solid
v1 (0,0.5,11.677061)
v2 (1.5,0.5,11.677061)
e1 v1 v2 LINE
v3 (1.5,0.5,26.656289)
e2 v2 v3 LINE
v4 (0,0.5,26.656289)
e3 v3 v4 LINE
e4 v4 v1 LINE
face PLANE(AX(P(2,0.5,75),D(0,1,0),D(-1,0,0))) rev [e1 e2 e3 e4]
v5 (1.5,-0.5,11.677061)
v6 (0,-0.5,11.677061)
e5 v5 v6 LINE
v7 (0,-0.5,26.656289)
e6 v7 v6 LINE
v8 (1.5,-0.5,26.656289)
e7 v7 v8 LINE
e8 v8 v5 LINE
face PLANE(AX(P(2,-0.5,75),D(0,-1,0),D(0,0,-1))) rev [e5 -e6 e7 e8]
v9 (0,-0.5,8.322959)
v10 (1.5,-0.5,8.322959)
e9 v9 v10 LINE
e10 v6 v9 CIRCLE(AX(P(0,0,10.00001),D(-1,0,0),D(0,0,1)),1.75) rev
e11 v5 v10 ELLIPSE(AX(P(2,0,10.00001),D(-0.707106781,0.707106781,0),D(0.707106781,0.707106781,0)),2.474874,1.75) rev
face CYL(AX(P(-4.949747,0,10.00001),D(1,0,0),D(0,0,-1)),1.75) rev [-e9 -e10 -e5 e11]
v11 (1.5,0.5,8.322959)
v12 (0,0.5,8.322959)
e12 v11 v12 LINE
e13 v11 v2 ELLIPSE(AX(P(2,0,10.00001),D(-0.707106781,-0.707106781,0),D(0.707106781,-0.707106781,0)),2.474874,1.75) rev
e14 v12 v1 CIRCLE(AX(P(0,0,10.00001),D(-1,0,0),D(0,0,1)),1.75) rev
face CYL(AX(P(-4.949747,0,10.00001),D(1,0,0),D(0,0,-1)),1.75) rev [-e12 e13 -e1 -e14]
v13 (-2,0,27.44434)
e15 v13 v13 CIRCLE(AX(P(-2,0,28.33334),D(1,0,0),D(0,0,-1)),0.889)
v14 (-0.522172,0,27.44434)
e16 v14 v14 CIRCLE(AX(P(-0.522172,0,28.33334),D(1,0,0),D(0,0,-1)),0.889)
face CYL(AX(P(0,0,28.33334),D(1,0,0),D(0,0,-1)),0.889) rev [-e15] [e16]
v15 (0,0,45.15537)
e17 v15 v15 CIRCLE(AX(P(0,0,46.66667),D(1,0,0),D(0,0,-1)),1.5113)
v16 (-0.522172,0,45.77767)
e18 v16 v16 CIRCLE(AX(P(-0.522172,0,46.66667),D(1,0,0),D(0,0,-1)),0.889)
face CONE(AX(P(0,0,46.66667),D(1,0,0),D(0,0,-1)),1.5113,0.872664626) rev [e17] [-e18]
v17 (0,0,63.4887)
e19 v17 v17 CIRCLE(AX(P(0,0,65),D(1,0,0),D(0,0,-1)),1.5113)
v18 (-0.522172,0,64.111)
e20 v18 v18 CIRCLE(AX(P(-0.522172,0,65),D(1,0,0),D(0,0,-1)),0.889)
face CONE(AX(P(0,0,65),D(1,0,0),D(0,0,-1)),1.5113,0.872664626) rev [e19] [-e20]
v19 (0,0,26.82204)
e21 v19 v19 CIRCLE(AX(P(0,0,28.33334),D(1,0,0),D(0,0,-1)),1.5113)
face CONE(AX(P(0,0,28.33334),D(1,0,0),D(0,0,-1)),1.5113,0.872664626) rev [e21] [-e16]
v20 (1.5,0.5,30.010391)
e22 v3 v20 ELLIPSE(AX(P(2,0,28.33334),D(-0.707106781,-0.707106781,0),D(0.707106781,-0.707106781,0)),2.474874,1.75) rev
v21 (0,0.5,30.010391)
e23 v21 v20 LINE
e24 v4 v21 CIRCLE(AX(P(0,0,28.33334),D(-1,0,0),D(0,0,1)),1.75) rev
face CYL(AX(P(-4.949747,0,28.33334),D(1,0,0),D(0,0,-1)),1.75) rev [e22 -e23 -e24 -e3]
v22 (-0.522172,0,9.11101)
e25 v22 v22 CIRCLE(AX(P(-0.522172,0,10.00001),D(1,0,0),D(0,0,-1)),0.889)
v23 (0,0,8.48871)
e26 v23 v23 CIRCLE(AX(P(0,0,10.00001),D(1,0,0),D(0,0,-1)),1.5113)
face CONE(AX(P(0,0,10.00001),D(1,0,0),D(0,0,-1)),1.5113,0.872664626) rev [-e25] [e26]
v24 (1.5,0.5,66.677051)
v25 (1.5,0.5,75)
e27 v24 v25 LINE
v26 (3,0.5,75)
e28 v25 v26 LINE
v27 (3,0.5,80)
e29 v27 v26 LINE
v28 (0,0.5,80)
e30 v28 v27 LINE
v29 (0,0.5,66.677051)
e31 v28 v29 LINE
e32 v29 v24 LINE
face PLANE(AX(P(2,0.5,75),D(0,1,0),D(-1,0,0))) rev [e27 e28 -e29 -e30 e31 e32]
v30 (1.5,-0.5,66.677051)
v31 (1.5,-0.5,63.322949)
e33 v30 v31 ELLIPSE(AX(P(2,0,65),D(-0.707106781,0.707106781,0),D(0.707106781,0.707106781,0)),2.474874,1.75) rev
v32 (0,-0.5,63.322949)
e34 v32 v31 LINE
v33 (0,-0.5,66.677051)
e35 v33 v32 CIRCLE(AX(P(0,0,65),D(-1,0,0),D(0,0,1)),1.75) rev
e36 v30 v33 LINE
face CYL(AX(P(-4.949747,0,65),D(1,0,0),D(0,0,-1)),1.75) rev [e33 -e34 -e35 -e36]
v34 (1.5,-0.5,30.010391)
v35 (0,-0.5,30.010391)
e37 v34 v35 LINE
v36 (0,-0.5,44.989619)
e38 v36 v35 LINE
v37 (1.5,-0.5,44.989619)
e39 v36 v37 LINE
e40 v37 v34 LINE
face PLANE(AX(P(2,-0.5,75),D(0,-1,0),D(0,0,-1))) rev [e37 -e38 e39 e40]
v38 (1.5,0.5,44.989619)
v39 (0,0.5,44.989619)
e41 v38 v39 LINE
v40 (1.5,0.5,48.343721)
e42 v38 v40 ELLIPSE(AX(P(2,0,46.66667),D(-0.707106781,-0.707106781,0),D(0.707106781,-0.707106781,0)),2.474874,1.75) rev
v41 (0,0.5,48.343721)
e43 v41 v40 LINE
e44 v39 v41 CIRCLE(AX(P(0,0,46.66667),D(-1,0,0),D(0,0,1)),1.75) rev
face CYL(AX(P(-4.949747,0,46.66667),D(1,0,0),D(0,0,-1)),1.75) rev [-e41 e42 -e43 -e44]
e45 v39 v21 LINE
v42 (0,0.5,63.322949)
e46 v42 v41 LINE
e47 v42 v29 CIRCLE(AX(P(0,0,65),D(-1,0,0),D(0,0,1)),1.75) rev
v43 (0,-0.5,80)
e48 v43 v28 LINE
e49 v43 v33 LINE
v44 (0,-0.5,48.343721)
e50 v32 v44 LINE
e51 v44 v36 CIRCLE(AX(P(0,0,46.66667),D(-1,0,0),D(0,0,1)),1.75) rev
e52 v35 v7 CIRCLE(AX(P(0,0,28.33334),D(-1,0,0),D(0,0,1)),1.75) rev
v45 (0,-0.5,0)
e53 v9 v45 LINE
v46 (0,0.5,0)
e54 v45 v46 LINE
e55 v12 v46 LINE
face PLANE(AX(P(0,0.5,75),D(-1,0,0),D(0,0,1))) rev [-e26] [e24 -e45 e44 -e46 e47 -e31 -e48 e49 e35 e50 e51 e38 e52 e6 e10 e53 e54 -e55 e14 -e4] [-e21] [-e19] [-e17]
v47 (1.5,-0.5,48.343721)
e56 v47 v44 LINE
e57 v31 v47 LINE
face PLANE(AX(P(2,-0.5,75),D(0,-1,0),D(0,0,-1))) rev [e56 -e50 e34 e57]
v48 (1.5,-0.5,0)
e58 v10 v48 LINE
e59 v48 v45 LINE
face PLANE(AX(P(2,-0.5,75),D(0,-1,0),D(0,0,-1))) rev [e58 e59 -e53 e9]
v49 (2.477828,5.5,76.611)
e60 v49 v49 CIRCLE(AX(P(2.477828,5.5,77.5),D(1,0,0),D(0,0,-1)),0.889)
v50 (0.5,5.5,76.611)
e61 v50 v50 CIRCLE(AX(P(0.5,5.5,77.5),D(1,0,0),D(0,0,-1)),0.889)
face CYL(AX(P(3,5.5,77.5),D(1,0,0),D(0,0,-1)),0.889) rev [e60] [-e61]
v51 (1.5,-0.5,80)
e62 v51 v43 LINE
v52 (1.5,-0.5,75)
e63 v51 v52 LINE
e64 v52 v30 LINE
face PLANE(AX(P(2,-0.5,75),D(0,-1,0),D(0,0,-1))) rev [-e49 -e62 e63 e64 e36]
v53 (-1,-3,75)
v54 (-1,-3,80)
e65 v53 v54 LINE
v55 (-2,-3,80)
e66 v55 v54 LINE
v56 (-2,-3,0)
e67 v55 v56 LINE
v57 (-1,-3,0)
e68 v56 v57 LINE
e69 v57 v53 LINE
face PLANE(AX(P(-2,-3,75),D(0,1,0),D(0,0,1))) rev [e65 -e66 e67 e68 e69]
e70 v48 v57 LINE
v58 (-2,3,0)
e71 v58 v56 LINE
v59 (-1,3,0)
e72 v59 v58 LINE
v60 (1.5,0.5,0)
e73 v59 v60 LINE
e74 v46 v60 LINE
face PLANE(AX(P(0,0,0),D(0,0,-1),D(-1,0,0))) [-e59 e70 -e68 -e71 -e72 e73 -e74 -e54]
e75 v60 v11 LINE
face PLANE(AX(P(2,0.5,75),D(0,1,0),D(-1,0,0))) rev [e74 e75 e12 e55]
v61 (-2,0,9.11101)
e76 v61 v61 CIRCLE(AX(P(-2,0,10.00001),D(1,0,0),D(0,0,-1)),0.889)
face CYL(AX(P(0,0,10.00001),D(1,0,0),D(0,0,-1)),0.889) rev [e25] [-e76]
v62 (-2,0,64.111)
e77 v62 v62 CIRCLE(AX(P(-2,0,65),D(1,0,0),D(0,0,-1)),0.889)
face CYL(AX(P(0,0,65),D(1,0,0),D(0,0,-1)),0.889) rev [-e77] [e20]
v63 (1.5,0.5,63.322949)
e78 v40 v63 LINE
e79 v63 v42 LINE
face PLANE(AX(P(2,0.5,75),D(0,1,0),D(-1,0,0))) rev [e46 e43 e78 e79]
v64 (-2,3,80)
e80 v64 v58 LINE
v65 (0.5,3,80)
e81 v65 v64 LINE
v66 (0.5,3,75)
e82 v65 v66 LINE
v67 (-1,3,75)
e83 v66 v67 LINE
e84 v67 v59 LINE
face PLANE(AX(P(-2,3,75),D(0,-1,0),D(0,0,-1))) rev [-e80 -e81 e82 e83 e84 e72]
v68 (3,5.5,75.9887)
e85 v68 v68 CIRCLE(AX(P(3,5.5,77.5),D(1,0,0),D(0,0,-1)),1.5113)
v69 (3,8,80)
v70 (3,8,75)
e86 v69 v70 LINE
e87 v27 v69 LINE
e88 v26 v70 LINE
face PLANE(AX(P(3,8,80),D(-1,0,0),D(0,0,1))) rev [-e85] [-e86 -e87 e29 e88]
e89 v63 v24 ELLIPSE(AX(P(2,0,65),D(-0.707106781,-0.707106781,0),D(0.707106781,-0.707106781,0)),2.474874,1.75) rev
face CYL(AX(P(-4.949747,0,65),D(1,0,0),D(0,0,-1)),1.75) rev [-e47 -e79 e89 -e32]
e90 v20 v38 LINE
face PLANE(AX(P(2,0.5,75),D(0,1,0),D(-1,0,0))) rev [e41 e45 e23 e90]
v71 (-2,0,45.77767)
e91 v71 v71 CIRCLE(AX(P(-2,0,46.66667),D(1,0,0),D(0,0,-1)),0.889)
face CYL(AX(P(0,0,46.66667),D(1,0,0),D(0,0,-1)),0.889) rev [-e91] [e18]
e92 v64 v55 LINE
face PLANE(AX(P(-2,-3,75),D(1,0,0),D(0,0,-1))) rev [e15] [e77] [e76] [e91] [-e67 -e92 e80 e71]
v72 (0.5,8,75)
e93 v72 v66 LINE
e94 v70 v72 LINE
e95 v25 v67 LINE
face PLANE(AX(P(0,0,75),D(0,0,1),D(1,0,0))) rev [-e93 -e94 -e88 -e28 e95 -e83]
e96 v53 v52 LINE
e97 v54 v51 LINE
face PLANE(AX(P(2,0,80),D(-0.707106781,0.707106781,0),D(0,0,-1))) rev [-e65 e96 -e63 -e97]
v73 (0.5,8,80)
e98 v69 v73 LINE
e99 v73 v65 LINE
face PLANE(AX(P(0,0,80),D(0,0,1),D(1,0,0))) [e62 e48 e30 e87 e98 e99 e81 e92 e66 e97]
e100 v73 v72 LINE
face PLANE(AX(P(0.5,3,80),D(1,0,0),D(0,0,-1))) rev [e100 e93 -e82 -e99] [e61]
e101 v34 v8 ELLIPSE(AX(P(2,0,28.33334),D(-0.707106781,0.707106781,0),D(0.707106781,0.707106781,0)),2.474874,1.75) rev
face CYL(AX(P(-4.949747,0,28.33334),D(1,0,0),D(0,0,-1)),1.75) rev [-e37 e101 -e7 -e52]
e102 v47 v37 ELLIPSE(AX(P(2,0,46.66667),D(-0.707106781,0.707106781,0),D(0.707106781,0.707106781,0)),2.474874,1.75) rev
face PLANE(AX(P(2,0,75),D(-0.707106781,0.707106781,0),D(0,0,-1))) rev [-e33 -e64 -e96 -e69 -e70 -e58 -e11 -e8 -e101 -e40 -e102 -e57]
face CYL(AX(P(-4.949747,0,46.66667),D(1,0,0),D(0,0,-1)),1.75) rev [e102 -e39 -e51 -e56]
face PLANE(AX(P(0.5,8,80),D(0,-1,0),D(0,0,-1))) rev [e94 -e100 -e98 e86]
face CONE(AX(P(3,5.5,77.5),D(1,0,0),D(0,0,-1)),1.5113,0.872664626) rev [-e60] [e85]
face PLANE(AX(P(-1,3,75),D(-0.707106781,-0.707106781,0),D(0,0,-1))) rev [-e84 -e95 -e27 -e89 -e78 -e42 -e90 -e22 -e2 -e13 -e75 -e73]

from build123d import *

# Parameters (mm, degrees)
BOSS_EXTRUDE1_DEPTH                               = 75
SKETCH5_R                                         = 1.75
CUT_EXTRUDE1_DEPTH                                = 2
CSK_FOR_0_FLAT_HEAD_MACHINE_SCREW_100_D           = 1.778
CSK_FOR_0_FLAT_HEAD_MACHINE_SCREW_100_DEPTH       = 3.302
CSK_FOR_0_FLAT_HEAD_MACHINE_SCREW_100_CSINK_D     = 3.0226
CSK_FOR_0_FLAT_HEAD_MACHINE_SCREW_100_CSINK_ANGLE = 100
CSK_FOR_0_FLAT_HEAD_MACHINE_SCREW_100_TIP         = 0.53416509
CHAMFER1_SIZE                                     = 3
BOSS_EXTRUDE2_DEPTH                               = 5
CHAMFER2_SIZE                                     = 3
CSK_FOR_0_FLAT_HEAD_MACHINE_SCREW_2_D             = 1.778
CSK_FOR_0_FLAT_HEAD_MACHINE_SCREW_2_DEPTH         = 3.302
CSK_FOR_0_FLAT_HEAD_MACHINE_SCREW_2_CSINK_D       = 3.0226
CSK_FOR_0_FLAT_HEAD_MACHINE_SCREW_2_CSINK_ANGLE   = 100
CSK_FOR_0_FLAT_HEAD_MACHINE_SCREW_2_TIP           = 0.53416509


with BuildPart() as part:
    # Sketch1 → Boss-Extrude1 (new body)
    with BuildSketch(Plane.XY):
        Polygon((-2, -3), (2, -3), (2, -0.5), (0, -0.5), (0, 0.5), (2, 0.5), (2, 3), (-2, 3), align=None)
    extrude(amount=BOSS_EXTRUDE1_DEPTH)

    # Sketch5 → Cut-Extrude1 (cut)
    with BuildSketch(Plane(origin=(2, 0, 0), x_dir=(0, 0, -1), z_dir=(1, 0, 0))):
        with Locations((-65, 0)):
            Circle(SKETCH5_R)
        with Locations((-46.66667, 0)):
            Circle(SKETCH5_R)
        with Locations((-28.33334, 0)):
            Circle(SKETCH5_R)
        with Locations((-10.00001, 0)):
            Circle(SKETCH5_R)
    extrude(amount=-CUT_EXTRUDE1_DEPTH, mode=Mode.SUBTRACT)

    # CSK for _0 Flat Head Machine Screw _100
    with Locations(Plane(origin=(0, 0, 0), x_dir=(0, 0, -1), z_dir=(1, 0, 0))):
        with Locations((-65, 0), (-10.00001, 0), (-46.66667, 0), (-28.33334, 0)):
            CounterSinkHole(CSK_FOR_0_FLAT_HEAD_MACHINE_SCREW_100_D / 2, CSK_FOR_0_FLAT_HEAD_MACHINE_SCREW_100_CSINK_D / 2, depth=CSK_FOR_0_FLAT_HEAD_MACHINE_SCREW_100_DEPTH, counter_sink_angle=CSK_FOR_0_FLAT_HEAD_MACHINE_SCREW_100_CSINK_ANGLE)
            with Locations((0, 0, -(CSK_FOR_0_FLAT_HEAD_MACHINE_SCREW_100_DEPTH + CSK_FOR_0_FLAT_HEAD_MACHINE_SCREW_100_TIP / 2))):  # 118° drill point
                Cone(0, CSK_FOR_0_FLAT_HEAD_MACHINE_SCREW_100_D / 2, CSK_FOR_0_FLAT_HEAD_MACHINE_SCREW_100_TIP, mode=Mode.SUBTRACT)

    # Chamfer1
    # the kernel refuses this chamfer: 3 mm, written as the material it takes off along each edge
    with BuildSketch(Plane(origin=(2, -3, -7.715048964), x_dir=(-0.9996219169112968, -0.027495876610586348, 0), z_dir=(0, 0, 1))) as chamfer1_piece_1:
        Polygon((CHAMFER1_SIZE * 0.999621916911, -CHAMFER1_SIZE * 0.0274958766106), (-CHAMFER1_SIZE * 0.0274958766106, -CHAMFER1_SIZE * 0.999621916911), (0, 0), align=None)
    extrude(amount=90.430097928, mode=Mode.SUBTRACT)
    with BuildSketch(Plane(origin=(2, 3, -7.715048964), x_dir=(-0.9996219169112968, 0.027495876610586348, 0), z_dir=(0, 0, 1))) as chamfer1_piece_2:
        Polygon((CHAMFER1_SIZE * 0.999621916911, CHAMFER1_SIZE * 0.0274958766106), (-CHAMFER1_SIZE * 0.0274958766106, CHAMFER1_SIZE * 0.999621916911), (0, 0), align=None)
    extrude(amount=90.430097928, mode=Mode.SUBTRACT)

    # Sketch6 → Boss-Extrude2 (add)
    with BuildSketch(Plane.XY.offset(75)):
        Polygon((0.5, 8), (3, 8), (3, 0.5), (0, 0.5), (0, -0.5), (2, -0.5), (2, -3), (-2, -3), (-2, 3), (0.5, 3), align=None)
    extrude(amount=BOSS_EXTRUDE2_DEPTH)

    # Chamfer2
    # the kernel refuses this chamfer: 3 mm, written as the material it takes off along each edge
    with BuildSketch(Plane(origin=(2, -3, 67.284951036), x_dir=(-0.9996219169112968, -0.027495876610586348, 0), z_dir=(0, 0, 1))) as chamfer2_piece_1:
        Polygon((CHAMFER2_SIZE * 0.999621916911, -CHAMFER2_SIZE * 0.0274958766106), (-CHAMFER2_SIZE * 0.0274958766106, -CHAMFER2_SIZE * 0.999621916911), (0, 0), align=None)
    extrude(amount=20.430097928, mode=Mode.SUBTRACT)

    # CSK for _0 Flat Head Machine Screw _ 2
    with Locations(Plane(origin=(3, 0, 0), x_dir=(0, 0, -1), z_dir=(1, 0, 0))):
        with Locations((-77.5, 5.5)):
            CounterSinkHole(CSK_FOR_0_FLAT_HEAD_MACHINE_SCREW_2_D / 2, CSK_FOR_0_FLAT_HEAD_MACHINE_SCREW_2_CSINK_D / 2, depth=CSK_FOR_0_FLAT_HEAD_MACHINE_SCREW_2_DEPTH, counter_sink_angle=CSK_FOR_0_FLAT_HEAD_MACHINE_SCREW_2_CSINK_ANGLE)
            with Locations((0, 0, -(CSK_FOR_0_FLAT_HEAD_MACHINE_SCREW_2_DEPTH + CSK_FOR_0_FLAT_HEAD_MACHINE_SCREW_2_TIP / 2))):  # 118° drill point
                Cone(0, CSK_FOR_0_FLAT_HEAD_MACHINE_SCREW_2_D / 2, CSK_FOR_0_FLAT_HEAD_MACHINE_SCREW_2_TIP, mode=Mode.SUBTRACT)


solid = part.part
